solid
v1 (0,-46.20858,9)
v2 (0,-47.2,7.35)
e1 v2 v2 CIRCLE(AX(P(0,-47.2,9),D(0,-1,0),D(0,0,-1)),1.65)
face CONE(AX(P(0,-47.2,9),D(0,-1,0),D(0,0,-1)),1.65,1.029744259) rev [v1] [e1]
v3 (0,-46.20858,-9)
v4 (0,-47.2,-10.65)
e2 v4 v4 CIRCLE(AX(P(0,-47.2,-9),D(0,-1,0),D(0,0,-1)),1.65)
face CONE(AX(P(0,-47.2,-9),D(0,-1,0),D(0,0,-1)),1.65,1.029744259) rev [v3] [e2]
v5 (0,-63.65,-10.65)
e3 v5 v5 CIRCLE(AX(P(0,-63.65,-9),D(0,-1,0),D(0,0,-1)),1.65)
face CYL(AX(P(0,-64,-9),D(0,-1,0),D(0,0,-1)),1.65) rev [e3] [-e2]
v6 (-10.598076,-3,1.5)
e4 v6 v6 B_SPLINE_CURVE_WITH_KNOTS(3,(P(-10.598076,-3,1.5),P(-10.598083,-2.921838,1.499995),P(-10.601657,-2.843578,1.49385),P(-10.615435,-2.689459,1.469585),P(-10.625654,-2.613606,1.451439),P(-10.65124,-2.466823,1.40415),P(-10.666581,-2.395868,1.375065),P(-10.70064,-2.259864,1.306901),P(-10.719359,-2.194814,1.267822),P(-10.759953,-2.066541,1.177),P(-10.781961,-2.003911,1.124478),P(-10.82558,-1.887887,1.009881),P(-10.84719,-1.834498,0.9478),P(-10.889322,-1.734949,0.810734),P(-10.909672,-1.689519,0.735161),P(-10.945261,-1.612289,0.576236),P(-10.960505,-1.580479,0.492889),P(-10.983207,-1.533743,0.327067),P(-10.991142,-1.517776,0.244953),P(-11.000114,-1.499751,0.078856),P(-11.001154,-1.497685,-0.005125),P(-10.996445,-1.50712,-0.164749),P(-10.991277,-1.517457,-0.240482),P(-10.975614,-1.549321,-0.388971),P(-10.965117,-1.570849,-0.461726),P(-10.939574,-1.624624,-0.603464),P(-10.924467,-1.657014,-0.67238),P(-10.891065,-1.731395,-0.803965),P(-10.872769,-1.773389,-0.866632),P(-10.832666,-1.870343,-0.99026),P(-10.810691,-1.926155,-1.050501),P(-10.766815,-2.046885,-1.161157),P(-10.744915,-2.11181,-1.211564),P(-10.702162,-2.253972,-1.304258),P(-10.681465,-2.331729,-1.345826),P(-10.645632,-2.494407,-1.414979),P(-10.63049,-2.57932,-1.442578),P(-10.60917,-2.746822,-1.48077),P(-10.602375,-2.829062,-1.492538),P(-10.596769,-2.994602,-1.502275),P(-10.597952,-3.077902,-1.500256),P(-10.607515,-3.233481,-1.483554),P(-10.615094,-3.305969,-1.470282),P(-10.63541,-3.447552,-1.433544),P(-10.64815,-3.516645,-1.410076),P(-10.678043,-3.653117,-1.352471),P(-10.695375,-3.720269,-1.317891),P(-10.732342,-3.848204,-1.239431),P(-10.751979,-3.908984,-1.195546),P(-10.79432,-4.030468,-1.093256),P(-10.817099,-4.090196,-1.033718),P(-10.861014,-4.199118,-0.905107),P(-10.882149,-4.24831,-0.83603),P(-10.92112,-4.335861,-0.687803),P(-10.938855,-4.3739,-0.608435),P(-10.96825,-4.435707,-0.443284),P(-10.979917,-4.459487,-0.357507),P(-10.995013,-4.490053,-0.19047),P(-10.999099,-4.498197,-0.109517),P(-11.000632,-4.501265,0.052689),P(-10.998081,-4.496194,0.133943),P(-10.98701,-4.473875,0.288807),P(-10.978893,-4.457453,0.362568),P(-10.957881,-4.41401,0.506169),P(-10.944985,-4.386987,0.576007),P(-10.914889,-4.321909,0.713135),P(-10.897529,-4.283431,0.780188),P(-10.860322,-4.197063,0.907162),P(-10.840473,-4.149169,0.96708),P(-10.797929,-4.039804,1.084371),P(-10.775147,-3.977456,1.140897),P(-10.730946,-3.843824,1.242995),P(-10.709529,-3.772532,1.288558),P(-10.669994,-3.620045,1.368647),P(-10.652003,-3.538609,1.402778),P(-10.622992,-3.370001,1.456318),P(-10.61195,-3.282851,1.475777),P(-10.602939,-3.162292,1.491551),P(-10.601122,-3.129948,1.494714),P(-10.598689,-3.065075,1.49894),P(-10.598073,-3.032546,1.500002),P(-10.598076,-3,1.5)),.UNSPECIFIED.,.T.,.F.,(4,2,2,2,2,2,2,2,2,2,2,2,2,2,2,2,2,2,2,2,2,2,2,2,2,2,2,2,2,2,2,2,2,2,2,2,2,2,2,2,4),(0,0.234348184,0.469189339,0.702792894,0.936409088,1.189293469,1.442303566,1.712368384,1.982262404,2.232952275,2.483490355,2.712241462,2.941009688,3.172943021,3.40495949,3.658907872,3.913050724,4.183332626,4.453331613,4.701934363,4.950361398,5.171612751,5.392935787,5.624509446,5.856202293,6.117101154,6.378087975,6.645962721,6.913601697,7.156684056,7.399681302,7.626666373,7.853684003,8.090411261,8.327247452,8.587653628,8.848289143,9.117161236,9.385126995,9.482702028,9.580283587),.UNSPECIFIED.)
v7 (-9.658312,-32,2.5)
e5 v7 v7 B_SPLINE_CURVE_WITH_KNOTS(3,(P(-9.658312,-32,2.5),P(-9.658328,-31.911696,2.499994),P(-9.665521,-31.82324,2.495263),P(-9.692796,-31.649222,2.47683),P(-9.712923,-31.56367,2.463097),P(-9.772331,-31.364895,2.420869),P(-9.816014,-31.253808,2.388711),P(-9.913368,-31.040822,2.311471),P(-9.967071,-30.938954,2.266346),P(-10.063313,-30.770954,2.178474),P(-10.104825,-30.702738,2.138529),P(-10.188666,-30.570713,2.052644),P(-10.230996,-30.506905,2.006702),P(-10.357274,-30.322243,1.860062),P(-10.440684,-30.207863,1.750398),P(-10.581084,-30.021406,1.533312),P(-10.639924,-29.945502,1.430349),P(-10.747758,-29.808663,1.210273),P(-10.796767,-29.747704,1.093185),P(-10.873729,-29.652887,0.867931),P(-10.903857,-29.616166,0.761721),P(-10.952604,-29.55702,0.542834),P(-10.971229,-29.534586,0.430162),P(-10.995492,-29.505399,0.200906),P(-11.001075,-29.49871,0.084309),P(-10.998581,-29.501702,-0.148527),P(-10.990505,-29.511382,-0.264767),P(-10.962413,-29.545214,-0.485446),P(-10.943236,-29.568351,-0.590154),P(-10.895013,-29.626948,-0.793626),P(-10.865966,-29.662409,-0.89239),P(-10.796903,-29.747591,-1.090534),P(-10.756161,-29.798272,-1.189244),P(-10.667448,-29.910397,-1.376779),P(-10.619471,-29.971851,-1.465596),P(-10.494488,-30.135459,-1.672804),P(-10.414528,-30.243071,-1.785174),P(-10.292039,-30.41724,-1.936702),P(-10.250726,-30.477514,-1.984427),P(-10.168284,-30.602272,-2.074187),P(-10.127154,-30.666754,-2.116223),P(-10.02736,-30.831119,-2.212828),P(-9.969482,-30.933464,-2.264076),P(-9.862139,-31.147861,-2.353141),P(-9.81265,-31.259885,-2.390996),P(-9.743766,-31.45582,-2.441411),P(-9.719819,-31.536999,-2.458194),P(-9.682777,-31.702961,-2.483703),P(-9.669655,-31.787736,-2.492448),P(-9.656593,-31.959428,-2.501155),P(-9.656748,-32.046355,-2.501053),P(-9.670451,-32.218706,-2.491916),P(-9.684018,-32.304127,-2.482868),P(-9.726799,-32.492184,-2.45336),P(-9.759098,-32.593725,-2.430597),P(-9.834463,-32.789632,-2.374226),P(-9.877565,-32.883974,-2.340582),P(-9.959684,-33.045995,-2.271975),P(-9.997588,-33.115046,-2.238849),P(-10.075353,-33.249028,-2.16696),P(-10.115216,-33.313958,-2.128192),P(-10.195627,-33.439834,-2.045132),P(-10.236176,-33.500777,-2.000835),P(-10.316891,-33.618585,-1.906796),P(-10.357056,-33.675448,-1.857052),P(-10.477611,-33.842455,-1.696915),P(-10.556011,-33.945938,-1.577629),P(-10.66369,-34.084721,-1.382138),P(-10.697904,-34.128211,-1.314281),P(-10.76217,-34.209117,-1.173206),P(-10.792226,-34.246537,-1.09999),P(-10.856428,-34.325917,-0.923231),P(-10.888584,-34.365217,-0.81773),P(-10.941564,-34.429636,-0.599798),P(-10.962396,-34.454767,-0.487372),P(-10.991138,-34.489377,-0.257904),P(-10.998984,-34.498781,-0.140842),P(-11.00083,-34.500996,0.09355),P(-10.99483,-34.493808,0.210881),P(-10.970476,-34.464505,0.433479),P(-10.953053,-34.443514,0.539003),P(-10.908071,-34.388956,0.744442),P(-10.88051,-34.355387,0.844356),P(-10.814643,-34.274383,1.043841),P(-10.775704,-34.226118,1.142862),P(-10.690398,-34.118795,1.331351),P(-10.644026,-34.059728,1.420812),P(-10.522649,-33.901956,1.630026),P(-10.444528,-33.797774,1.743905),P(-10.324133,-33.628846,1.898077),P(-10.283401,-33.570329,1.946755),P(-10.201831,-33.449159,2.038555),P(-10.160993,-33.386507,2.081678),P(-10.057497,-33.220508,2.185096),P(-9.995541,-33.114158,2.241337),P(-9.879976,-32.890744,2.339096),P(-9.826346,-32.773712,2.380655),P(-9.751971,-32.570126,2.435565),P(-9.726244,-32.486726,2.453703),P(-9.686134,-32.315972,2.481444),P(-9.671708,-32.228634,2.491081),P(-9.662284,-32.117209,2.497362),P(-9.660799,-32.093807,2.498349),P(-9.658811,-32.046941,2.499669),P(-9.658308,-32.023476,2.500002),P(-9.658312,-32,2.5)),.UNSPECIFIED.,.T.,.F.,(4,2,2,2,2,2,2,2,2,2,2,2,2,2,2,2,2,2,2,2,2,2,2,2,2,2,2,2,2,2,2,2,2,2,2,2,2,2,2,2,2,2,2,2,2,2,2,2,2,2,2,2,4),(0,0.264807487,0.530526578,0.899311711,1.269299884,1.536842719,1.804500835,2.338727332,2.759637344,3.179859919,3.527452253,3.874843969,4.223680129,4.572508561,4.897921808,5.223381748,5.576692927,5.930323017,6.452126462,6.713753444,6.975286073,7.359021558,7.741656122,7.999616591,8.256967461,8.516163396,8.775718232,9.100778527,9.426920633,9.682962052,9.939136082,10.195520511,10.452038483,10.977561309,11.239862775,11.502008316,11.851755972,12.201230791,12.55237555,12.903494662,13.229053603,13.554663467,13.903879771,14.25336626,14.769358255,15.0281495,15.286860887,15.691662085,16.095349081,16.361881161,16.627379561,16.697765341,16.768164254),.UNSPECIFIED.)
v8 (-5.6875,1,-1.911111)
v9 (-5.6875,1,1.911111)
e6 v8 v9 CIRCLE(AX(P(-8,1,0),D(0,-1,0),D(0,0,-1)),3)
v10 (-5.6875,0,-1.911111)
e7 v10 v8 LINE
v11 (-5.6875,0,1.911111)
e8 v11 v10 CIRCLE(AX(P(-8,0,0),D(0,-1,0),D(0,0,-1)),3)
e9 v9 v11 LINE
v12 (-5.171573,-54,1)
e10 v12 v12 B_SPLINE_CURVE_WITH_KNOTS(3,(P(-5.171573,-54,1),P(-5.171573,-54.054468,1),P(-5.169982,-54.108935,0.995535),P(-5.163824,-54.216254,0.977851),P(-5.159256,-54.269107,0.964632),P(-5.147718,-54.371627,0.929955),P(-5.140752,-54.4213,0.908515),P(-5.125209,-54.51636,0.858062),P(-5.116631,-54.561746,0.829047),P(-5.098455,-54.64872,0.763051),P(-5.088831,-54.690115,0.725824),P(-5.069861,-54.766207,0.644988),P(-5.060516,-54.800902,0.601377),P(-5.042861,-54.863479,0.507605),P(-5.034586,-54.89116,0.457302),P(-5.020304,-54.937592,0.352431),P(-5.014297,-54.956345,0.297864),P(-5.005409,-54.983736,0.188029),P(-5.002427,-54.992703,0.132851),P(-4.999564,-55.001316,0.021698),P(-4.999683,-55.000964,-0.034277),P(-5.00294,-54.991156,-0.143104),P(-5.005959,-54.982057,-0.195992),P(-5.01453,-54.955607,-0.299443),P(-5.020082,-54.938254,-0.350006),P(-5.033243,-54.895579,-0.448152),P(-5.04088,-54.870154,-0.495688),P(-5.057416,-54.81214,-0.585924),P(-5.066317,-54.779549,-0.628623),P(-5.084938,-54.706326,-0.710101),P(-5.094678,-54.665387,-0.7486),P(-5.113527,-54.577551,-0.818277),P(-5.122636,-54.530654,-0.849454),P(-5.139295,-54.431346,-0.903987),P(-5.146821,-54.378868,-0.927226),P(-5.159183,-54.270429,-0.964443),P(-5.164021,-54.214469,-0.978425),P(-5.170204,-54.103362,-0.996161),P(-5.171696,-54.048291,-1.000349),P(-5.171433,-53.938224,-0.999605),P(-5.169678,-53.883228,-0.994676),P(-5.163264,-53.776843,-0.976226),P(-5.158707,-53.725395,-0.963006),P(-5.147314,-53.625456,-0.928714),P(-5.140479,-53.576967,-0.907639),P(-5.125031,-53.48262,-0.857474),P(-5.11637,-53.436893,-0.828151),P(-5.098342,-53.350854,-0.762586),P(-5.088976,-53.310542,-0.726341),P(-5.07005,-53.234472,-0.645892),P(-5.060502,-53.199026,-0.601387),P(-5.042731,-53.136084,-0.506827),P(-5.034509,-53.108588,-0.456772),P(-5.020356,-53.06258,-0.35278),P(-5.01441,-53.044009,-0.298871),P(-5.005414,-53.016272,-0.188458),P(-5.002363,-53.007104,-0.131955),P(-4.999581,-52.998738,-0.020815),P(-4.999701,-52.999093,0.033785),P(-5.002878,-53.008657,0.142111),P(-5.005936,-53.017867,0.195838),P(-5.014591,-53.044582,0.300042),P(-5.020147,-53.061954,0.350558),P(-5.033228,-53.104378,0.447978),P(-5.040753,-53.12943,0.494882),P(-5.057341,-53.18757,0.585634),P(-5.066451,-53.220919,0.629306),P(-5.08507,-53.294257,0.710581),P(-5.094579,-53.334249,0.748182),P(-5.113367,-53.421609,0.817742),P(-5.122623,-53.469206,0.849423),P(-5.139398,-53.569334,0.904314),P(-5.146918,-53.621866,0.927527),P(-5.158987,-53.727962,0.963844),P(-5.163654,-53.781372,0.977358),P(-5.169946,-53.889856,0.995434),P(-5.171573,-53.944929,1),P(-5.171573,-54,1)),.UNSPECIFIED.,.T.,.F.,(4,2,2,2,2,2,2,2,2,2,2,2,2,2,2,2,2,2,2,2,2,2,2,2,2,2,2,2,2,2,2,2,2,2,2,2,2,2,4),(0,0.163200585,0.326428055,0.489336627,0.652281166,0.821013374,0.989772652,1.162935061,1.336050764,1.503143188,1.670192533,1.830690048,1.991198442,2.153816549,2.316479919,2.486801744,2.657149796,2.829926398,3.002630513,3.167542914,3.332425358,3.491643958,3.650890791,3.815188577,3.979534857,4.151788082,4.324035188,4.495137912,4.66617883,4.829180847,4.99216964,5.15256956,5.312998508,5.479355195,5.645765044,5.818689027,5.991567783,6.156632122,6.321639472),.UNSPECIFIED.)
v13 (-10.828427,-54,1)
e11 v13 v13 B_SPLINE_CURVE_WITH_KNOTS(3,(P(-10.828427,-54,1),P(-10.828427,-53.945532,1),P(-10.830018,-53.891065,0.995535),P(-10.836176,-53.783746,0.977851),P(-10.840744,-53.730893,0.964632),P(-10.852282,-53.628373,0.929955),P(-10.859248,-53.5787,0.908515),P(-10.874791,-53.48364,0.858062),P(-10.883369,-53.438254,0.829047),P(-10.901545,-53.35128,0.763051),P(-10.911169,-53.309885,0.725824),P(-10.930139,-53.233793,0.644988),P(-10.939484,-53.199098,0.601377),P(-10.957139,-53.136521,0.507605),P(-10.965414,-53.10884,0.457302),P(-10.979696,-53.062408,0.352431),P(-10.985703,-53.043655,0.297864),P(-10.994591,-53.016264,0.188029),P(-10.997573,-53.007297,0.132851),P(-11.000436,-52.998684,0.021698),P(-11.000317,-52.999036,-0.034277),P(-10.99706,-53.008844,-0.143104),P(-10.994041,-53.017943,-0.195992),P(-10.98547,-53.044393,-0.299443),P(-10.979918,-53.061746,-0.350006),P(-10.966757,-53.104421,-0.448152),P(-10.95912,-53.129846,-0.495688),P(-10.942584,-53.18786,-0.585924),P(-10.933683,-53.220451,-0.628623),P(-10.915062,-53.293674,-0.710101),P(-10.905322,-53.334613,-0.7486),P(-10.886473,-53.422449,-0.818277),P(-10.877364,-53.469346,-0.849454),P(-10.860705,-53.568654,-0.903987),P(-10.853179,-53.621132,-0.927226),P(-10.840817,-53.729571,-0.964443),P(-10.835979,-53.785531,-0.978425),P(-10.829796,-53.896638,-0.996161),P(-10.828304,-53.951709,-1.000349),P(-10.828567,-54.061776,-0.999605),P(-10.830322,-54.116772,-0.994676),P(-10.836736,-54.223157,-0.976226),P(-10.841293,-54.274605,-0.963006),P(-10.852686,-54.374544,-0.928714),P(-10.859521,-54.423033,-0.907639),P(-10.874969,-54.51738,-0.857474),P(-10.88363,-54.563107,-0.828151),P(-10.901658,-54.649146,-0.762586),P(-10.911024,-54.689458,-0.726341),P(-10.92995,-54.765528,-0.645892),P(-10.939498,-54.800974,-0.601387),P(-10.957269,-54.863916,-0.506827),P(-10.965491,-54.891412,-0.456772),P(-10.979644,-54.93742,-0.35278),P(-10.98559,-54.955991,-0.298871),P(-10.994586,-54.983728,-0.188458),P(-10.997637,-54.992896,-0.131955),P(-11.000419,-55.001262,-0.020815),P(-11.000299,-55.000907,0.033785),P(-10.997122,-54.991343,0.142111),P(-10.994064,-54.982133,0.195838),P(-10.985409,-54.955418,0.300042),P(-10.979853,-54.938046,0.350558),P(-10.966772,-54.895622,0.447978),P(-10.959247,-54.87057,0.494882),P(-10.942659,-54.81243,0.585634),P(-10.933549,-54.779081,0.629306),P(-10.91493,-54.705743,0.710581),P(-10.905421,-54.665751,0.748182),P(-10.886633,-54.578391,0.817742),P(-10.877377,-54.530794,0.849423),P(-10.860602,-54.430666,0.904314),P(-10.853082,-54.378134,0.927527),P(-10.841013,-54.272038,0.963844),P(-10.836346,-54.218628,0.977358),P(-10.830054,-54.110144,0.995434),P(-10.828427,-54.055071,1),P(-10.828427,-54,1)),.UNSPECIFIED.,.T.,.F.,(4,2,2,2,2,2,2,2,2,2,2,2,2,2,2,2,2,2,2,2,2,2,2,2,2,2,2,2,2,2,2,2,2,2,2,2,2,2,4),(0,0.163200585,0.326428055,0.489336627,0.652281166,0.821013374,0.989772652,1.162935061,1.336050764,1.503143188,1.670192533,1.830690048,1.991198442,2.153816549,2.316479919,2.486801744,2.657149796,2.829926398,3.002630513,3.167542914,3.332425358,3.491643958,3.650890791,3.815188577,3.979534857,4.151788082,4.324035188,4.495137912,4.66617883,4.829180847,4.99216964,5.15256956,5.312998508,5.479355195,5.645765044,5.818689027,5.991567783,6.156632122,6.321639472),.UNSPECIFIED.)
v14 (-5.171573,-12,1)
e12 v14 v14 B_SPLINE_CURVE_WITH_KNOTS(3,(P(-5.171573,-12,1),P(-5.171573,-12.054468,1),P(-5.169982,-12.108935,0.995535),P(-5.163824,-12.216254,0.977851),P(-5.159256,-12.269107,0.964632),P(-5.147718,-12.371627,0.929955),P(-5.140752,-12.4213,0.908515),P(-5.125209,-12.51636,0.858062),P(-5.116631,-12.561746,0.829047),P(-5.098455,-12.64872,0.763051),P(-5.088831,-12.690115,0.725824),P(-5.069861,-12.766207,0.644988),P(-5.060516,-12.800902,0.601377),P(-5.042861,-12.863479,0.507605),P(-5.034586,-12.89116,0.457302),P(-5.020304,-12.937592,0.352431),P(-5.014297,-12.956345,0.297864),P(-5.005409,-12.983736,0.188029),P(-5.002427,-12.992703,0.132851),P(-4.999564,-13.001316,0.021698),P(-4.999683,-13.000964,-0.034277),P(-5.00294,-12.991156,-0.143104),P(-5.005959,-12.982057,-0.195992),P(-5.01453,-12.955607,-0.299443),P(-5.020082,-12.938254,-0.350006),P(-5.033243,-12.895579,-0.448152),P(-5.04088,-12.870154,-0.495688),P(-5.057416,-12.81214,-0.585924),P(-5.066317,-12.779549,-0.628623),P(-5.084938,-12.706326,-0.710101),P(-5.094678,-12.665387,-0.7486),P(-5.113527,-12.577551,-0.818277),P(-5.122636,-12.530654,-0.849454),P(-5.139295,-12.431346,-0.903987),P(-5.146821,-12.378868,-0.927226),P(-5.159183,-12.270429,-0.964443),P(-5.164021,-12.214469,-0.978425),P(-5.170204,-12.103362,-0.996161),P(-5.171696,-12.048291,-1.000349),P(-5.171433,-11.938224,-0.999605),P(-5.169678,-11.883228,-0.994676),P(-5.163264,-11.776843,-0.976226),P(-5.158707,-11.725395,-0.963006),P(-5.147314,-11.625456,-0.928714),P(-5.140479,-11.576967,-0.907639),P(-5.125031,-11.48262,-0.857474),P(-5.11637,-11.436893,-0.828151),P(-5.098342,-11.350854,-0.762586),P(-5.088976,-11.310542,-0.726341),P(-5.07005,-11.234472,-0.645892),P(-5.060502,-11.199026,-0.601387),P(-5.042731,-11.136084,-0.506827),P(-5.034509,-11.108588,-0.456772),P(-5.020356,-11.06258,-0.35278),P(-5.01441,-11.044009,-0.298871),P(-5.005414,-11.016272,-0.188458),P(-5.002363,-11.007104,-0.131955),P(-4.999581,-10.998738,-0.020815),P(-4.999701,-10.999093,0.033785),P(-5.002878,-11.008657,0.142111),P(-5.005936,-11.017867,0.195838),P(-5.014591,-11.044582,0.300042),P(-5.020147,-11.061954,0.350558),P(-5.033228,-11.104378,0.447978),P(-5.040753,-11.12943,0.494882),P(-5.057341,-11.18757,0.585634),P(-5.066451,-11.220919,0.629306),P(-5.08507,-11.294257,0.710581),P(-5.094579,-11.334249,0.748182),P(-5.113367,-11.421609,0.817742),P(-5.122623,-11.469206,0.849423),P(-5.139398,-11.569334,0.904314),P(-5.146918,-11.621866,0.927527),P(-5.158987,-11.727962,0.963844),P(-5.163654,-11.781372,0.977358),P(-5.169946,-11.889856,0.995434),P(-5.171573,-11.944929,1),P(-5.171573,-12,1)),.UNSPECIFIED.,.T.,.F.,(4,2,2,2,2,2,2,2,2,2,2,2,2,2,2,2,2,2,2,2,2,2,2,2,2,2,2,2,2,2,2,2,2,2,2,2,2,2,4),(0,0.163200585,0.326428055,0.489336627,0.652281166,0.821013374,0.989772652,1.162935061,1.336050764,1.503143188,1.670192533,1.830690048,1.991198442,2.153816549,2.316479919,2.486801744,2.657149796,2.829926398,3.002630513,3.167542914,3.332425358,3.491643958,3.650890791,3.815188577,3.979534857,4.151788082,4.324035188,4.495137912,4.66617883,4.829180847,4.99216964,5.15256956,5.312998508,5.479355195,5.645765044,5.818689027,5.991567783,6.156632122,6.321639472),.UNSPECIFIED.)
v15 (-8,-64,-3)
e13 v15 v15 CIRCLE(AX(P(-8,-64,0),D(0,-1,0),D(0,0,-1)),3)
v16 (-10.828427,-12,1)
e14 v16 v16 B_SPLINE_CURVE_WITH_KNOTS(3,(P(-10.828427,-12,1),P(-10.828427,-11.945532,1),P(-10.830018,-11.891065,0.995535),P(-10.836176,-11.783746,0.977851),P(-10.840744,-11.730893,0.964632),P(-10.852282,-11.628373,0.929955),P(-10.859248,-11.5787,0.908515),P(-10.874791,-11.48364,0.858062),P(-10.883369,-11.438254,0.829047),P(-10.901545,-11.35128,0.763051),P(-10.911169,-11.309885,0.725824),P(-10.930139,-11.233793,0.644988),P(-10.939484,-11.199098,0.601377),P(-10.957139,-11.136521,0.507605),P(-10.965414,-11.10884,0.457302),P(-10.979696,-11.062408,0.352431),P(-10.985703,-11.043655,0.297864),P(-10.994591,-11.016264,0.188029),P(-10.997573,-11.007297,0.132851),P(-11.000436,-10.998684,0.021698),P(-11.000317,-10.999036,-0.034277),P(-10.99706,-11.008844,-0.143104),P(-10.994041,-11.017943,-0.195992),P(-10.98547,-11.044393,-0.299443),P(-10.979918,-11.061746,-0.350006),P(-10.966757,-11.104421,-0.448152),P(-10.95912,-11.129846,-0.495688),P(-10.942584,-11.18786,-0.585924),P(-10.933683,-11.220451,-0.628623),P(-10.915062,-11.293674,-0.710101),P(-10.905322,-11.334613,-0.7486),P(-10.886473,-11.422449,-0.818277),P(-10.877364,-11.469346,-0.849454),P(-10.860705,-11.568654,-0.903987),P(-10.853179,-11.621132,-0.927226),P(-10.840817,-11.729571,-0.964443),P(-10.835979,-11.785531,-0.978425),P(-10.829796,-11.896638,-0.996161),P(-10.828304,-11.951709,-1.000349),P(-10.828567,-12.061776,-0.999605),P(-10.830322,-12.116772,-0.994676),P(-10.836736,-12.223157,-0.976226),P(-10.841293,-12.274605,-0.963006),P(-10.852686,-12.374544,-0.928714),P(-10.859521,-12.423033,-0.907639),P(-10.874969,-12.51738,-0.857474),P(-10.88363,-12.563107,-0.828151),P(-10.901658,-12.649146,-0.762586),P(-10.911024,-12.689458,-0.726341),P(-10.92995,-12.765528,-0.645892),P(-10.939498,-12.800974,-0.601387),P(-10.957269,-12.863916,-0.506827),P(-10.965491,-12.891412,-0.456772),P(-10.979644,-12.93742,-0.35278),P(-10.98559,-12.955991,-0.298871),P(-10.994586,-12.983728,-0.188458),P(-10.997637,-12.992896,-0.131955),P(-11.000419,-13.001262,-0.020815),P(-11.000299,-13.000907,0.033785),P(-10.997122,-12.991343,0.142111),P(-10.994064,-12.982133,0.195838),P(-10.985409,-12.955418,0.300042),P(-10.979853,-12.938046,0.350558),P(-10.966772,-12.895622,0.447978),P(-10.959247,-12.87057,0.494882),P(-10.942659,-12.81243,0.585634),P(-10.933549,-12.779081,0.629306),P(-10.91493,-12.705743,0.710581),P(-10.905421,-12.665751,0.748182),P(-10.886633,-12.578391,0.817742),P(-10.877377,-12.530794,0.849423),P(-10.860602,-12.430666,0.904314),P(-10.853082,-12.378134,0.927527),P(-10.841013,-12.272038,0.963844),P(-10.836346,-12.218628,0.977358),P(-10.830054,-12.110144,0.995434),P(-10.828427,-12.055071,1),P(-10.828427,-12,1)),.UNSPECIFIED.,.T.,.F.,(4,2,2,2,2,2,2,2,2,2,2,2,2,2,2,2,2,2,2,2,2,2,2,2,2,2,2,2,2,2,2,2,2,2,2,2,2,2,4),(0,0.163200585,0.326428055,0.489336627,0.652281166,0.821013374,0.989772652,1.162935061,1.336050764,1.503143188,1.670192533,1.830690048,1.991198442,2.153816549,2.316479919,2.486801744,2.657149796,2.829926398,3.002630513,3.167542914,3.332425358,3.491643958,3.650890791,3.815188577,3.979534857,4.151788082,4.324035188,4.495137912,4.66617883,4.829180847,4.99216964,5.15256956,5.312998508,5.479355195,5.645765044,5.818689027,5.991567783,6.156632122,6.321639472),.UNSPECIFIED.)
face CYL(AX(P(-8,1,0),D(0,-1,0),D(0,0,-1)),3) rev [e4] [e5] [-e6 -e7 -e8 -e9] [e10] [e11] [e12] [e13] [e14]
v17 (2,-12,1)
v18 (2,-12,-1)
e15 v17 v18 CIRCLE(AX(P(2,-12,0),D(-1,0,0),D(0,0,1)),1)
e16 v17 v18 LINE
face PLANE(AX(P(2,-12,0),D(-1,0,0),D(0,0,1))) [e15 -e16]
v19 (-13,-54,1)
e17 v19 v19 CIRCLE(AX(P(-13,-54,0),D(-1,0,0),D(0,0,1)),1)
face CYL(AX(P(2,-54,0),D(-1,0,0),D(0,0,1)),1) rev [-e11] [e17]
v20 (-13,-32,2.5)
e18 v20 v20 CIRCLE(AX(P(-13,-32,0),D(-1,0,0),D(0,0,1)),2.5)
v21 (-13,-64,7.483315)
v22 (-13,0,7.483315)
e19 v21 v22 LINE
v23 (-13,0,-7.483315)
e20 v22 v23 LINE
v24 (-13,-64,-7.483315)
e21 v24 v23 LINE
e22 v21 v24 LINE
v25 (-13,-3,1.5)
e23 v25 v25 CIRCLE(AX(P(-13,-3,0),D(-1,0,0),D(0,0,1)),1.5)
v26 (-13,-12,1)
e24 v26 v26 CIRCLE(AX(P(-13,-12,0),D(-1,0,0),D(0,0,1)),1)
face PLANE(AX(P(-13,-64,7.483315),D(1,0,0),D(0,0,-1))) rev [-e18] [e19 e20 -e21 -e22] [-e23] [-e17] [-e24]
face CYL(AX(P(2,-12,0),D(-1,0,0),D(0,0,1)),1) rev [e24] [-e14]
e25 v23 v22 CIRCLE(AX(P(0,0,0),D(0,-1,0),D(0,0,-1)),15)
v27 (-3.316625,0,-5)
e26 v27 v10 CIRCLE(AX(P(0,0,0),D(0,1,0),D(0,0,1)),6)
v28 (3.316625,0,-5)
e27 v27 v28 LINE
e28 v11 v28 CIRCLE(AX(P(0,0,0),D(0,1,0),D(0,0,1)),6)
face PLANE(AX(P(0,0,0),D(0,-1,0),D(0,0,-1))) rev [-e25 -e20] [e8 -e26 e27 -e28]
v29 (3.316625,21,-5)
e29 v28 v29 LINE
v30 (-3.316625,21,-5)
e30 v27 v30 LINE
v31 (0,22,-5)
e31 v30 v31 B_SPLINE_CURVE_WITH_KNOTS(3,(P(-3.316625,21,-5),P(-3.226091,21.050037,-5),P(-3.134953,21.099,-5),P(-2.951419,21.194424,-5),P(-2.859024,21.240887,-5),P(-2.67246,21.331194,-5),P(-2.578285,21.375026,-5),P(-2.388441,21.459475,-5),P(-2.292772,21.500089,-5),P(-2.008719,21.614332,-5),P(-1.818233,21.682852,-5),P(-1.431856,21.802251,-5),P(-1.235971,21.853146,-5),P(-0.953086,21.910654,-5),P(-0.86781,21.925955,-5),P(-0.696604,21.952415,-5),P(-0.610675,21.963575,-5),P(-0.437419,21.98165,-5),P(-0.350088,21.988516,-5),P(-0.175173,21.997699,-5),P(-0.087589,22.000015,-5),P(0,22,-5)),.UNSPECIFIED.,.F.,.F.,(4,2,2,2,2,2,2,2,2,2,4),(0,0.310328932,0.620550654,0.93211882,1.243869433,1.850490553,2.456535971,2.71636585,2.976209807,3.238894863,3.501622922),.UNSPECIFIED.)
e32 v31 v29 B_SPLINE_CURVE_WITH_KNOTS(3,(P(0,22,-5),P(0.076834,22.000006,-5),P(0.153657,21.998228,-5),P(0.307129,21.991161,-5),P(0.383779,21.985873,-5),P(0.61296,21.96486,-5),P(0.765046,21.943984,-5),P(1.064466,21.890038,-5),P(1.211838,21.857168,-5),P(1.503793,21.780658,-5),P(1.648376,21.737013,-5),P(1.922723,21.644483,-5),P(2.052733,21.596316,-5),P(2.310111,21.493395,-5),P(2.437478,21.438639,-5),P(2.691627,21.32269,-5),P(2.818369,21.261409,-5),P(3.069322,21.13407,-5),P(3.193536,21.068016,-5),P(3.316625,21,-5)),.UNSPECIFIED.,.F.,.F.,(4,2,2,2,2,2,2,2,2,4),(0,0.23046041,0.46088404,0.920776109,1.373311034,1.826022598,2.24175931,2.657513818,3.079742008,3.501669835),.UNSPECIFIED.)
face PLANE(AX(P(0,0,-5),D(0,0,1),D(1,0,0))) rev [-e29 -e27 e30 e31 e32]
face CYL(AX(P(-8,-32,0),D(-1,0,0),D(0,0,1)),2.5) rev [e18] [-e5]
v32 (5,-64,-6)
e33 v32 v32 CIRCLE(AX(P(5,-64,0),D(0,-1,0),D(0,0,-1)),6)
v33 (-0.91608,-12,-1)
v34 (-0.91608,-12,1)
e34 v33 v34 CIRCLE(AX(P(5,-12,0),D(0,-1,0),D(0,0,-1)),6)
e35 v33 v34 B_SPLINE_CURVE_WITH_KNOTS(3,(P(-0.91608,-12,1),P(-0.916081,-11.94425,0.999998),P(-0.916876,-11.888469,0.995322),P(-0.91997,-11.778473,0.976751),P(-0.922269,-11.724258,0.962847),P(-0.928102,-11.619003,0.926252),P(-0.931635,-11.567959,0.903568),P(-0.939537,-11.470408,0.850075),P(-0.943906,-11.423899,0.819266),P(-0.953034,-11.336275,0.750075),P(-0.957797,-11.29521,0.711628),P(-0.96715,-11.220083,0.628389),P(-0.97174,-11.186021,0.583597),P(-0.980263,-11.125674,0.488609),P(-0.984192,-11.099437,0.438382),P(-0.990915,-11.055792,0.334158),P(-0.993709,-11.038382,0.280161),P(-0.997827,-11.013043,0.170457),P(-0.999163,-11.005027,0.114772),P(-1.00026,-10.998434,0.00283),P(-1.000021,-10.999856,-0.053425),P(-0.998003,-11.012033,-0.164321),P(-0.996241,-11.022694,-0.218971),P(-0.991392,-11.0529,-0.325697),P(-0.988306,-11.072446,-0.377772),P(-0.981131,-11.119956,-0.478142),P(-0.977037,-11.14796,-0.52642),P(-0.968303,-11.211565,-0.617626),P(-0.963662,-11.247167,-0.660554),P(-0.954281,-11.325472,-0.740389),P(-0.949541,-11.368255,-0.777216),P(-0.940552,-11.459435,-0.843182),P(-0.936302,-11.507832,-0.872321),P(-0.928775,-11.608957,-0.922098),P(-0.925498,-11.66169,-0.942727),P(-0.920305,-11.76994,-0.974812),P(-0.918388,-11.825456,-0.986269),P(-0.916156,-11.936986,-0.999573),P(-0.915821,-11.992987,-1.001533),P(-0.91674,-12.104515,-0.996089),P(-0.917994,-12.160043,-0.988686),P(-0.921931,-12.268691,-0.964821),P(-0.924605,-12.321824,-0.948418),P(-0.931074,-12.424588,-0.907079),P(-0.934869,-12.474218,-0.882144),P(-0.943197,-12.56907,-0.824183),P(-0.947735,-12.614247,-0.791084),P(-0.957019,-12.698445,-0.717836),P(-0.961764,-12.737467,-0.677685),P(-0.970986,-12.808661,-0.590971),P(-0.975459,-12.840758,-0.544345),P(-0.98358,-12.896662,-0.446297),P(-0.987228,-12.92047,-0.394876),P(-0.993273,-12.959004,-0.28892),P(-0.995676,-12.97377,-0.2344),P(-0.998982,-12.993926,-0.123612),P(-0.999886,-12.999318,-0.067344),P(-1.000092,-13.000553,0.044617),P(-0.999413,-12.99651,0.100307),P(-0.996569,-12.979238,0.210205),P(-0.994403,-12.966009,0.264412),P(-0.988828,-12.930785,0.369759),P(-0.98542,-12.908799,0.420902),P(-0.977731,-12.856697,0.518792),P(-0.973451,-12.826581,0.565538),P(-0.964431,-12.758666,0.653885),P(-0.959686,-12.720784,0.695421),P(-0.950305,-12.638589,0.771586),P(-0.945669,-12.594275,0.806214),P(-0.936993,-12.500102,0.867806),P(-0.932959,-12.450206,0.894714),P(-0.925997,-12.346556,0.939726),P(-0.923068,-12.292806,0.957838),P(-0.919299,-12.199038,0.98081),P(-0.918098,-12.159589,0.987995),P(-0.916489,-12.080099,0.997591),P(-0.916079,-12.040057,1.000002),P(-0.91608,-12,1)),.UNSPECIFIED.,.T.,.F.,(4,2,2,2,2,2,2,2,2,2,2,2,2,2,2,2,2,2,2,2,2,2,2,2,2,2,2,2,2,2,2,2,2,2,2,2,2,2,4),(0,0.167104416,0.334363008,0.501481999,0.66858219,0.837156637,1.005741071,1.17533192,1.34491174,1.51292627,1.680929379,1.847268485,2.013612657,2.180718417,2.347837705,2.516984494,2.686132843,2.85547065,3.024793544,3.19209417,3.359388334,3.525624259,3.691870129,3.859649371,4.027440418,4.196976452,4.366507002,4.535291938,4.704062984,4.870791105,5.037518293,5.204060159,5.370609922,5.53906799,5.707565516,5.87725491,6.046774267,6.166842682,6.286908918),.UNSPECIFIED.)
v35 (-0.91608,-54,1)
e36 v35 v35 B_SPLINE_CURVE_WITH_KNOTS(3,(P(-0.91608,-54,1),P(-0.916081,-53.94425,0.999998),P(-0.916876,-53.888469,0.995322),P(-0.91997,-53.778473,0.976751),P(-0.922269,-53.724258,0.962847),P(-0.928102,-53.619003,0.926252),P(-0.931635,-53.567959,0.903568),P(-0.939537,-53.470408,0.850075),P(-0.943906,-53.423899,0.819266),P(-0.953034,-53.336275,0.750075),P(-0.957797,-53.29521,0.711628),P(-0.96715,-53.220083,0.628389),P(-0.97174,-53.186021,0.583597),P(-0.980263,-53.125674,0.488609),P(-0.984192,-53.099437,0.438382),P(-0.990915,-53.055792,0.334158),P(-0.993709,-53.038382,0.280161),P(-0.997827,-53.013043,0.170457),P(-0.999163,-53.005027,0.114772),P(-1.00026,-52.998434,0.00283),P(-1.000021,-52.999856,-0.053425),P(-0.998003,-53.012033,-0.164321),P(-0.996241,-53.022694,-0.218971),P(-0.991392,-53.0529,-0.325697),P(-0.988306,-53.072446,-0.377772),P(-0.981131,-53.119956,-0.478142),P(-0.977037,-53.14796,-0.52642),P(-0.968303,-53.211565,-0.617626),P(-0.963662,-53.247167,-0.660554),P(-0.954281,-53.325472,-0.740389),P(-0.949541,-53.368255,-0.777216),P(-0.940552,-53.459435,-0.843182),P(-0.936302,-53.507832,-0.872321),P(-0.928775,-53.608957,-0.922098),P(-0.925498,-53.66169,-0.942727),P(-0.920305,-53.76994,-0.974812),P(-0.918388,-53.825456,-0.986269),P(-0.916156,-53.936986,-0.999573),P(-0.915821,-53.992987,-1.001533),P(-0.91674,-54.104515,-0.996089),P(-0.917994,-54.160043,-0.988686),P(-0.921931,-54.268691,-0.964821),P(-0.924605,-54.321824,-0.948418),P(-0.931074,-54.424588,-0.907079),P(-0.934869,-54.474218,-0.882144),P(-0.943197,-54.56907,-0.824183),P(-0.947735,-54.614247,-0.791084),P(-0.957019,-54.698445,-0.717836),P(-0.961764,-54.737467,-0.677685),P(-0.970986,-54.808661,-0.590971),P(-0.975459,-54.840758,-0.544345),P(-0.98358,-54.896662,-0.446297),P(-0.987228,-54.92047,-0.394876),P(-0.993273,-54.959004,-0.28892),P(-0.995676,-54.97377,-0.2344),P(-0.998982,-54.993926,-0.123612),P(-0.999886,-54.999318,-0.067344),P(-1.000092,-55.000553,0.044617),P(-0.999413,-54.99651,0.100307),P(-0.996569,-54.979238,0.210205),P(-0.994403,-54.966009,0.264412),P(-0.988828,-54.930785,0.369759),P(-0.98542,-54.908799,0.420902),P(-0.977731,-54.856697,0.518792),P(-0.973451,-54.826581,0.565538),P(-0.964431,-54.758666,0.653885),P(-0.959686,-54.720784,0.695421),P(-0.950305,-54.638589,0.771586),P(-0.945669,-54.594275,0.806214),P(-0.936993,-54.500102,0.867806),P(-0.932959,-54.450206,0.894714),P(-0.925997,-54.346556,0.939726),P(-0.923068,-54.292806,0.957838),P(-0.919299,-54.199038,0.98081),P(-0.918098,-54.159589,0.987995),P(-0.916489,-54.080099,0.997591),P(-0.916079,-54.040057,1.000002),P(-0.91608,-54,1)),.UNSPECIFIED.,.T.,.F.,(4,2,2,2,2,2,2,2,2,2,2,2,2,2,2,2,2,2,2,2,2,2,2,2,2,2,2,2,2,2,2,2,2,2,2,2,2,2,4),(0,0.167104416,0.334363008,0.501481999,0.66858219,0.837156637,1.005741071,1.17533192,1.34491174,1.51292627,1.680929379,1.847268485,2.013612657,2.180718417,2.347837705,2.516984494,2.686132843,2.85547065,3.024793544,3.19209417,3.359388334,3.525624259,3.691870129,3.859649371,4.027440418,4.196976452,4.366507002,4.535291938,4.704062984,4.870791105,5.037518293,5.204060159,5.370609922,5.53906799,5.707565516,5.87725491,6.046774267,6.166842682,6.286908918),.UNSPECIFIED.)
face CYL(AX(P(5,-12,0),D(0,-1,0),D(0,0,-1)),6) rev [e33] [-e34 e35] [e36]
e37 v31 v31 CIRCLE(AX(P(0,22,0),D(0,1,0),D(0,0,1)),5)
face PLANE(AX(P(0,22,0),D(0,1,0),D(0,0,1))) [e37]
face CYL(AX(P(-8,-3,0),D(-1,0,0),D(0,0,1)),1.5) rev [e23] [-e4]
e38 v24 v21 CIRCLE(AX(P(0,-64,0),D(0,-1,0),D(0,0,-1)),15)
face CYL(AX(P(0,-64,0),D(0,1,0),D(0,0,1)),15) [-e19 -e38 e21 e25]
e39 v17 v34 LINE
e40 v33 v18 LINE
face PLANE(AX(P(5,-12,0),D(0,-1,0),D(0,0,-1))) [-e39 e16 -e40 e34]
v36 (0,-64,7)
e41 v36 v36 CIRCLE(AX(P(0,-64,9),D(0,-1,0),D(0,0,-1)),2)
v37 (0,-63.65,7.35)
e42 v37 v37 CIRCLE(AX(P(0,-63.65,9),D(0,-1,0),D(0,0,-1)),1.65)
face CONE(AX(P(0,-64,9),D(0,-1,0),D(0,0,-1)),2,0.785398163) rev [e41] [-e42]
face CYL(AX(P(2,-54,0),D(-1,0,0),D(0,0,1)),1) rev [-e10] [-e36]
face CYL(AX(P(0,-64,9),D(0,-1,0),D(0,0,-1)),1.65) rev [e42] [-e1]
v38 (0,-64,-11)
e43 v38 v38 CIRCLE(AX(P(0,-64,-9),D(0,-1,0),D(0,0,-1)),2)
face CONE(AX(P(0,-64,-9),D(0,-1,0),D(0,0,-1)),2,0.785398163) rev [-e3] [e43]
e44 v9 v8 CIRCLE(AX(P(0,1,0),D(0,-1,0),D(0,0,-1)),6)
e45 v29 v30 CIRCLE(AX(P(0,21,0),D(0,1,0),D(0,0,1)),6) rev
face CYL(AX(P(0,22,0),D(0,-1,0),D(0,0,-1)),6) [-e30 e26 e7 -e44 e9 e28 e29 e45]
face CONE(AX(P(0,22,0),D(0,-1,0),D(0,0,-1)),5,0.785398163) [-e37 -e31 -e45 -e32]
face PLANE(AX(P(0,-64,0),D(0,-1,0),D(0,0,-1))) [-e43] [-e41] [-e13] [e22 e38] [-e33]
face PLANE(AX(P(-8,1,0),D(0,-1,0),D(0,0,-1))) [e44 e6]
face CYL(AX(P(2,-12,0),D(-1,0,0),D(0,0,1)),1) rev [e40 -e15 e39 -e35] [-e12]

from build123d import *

# Parameters (mm, degrees)
BOSS_EXTRUDE1_DEPTH         = 22
BOSS_EXTRUDE2_DEPTH         = 64
SKETCH3_R                   = 3
CUT_EXTRUDE1_DEPTH          = 65
SKETCH4_R                   = 6
CUT_EXTRUDE2_DEPTH          = 52
M4_TAPPED_HOLE2_D           = 3.3
M4_TAPPED_HOLE2_DEPTH       = 16.8
M4_TAPPED_HOLE2_CSINK_D     = 4
M4_TAPPED_HOLE2_CSINK_ANGLE = 90
M4_TAPPED_HOLE2_TIP         = 0.991420021
SKETCH20_R                  = 2.5
SKETCH20_R_2                = 1.5
CUT_EXTRUDE3_DEPTH          = 5
SKETCH21_R                  = 1
CUT_EXTRUDE4_DEPTH          = 15
BOSS_EXTRUDE4_START         = -22
BOSS_EXTRUDE4_DEPTH         = 22
CUT_EXTRUDE5_DEPTH          = 22
CHAMFER1_SIZE               = 1


with BuildPart() as part:
    # Sketch1 → Boss-Extrude1 (new body)
    with BuildSketch(Plane(origin=(0, 0, 0), x_dir=(1, 0, 0), z_dir=(0, 1, 0))):
        with BuildLine():
            Line((-3.31662479, -5), (3.31662479, -5))
            ThreePointArc((3.31662479, -5), (0, 6), (-3.31662479, -5))
        make_face()
    extrude(amount=BOSS_EXTRUDE1_DEPTH)

    # Sketch2 → Boss-Extrude2 (add)
    with BuildSketch(Plane.XZ):
        with BuildLine():
            Line((-13, 7.483314774), (-13, -7.483314774))
            ThreePointArc((-13, -7.483314774), (15, 0), (-13, 7.483314774))
        make_face()
    extrude(amount=BOSS_EXTRUDE2_DEPTH)

    # Sketch3 → Cut-Extrude1 (cut)
    with BuildSketch(Plane.XZ.offset(64)):
        with Locations(Location((-8, 0, 0), (0, 0, 270))):
            Circle(SKETCH3_R)
    extrude(amount=-CUT_EXTRUDE1_DEPTH, mode=Mode.SUBTRACT)

    # Sketch4 → Cut-Extrude2 (cut)
    with BuildSketch(Plane(origin=(0, -64, 0), x_dir=(-1, 0, 0), z_dir=(0, -1, 0))):
        with Locations(Location((-5, 0, 0), (0, 0, 90))):
            Circle(SKETCH4_R)
    extrude(amount=-CUT_EXTRUDE2_DEPTH, mode=Mode.SUBTRACT)

    # M4 Tapped Hole2
    with Locations(Plane(origin=(0, -64, 0), x_dir=(-1, 0, 0), z_dir=(0, -1, 0))):
        with Locations((0, -9), (0, 9)):
            CounterSinkHole(M4_TAPPED_HOLE2_D / 2, M4_TAPPED_HOLE2_CSINK_D / 2, depth=M4_TAPPED_HOLE2_DEPTH, counter_sink_angle=M4_TAPPED_HOLE2_CSINK_ANGLE)
            with Locations((0, 0, -(M4_TAPPED_HOLE2_DEPTH + M4_TAPPED_HOLE2_TIP / 2))):  # 118° drill point
                Cone(0, M4_TAPPED_HOLE2_D / 2, M4_TAPPED_HOLE2_TIP, mode=Mode.SUBTRACT)

    # Sketch20 → Cut-Extrude3 (cut)
    with BuildSketch(Plane.ZY.offset(13)):
        with Locations((0, -32)):
            Circle(SKETCH20_R)
        with Locations((0, -3)):
            Circle(SKETCH20_R_2)
    extrude(amount=-CUT_EXTRUDE3_DEPTH, mode=Mode.SUBTRACT)

    # Sketch21 → Cut-Extrude4 (cut)
    with BuildSketch(Plane.ZY.offset(13)):
        with Locations((0, -12)):
            Circle(SKETCH21_R)
        with Locations((0, -54)):
            Circle(SKETCH21_R)
    extrude(amount=-CUT_EXTRUDE4_DEPTH, mode=Mode.SUBTRACT)

    # Sketch22 → Boss-Extrude4 (add)
    with BuildSketch(Plane(origin=(0, 22, 0), x_dir=(1, 0, 0), z_dir=(0, 1, 0)).offset(BOSS_EXTRUDE4_START)):
        with BuildLine():
            Line((3.31662479, -5), (-3.31662479, -5))
            ThreePointArc((-3.31662479, -5), (0, -6), (3.31662479, -5))
        make_face()
    extrude(amount=BOSS_EXTRUDE4_DEPTH)

    # Sketch23 → Cut-Extrude5 (cut)
    with BuildSketch(Plane(origin=(0, 22, 0), x_dir=(1, 0, 0), z_dir=(0, 1, 0))):
        Polygon((-67.556784956, 5), (-3.31662479, 5), (3.31662479, 5), (67.556784956, 5), (67.556784956, 133.480320332), (-67.556784956, 133.480320332), align=None)
    extrude(amount=-CUT_EXTRUDE5_DEPTH, mode=Mode.SUBTRACT)

    # Chamfer1
    chamfer1_edges = [part.edges().sort_by_distance(p)[0] for p in [
        (0, 22, 6),
    ]]
    chamfer(chamfer1_edges, length=CHAMFER1_SIZE - 0.0001)  # a hair under: the kernel refuses the full size


solid = part.part
